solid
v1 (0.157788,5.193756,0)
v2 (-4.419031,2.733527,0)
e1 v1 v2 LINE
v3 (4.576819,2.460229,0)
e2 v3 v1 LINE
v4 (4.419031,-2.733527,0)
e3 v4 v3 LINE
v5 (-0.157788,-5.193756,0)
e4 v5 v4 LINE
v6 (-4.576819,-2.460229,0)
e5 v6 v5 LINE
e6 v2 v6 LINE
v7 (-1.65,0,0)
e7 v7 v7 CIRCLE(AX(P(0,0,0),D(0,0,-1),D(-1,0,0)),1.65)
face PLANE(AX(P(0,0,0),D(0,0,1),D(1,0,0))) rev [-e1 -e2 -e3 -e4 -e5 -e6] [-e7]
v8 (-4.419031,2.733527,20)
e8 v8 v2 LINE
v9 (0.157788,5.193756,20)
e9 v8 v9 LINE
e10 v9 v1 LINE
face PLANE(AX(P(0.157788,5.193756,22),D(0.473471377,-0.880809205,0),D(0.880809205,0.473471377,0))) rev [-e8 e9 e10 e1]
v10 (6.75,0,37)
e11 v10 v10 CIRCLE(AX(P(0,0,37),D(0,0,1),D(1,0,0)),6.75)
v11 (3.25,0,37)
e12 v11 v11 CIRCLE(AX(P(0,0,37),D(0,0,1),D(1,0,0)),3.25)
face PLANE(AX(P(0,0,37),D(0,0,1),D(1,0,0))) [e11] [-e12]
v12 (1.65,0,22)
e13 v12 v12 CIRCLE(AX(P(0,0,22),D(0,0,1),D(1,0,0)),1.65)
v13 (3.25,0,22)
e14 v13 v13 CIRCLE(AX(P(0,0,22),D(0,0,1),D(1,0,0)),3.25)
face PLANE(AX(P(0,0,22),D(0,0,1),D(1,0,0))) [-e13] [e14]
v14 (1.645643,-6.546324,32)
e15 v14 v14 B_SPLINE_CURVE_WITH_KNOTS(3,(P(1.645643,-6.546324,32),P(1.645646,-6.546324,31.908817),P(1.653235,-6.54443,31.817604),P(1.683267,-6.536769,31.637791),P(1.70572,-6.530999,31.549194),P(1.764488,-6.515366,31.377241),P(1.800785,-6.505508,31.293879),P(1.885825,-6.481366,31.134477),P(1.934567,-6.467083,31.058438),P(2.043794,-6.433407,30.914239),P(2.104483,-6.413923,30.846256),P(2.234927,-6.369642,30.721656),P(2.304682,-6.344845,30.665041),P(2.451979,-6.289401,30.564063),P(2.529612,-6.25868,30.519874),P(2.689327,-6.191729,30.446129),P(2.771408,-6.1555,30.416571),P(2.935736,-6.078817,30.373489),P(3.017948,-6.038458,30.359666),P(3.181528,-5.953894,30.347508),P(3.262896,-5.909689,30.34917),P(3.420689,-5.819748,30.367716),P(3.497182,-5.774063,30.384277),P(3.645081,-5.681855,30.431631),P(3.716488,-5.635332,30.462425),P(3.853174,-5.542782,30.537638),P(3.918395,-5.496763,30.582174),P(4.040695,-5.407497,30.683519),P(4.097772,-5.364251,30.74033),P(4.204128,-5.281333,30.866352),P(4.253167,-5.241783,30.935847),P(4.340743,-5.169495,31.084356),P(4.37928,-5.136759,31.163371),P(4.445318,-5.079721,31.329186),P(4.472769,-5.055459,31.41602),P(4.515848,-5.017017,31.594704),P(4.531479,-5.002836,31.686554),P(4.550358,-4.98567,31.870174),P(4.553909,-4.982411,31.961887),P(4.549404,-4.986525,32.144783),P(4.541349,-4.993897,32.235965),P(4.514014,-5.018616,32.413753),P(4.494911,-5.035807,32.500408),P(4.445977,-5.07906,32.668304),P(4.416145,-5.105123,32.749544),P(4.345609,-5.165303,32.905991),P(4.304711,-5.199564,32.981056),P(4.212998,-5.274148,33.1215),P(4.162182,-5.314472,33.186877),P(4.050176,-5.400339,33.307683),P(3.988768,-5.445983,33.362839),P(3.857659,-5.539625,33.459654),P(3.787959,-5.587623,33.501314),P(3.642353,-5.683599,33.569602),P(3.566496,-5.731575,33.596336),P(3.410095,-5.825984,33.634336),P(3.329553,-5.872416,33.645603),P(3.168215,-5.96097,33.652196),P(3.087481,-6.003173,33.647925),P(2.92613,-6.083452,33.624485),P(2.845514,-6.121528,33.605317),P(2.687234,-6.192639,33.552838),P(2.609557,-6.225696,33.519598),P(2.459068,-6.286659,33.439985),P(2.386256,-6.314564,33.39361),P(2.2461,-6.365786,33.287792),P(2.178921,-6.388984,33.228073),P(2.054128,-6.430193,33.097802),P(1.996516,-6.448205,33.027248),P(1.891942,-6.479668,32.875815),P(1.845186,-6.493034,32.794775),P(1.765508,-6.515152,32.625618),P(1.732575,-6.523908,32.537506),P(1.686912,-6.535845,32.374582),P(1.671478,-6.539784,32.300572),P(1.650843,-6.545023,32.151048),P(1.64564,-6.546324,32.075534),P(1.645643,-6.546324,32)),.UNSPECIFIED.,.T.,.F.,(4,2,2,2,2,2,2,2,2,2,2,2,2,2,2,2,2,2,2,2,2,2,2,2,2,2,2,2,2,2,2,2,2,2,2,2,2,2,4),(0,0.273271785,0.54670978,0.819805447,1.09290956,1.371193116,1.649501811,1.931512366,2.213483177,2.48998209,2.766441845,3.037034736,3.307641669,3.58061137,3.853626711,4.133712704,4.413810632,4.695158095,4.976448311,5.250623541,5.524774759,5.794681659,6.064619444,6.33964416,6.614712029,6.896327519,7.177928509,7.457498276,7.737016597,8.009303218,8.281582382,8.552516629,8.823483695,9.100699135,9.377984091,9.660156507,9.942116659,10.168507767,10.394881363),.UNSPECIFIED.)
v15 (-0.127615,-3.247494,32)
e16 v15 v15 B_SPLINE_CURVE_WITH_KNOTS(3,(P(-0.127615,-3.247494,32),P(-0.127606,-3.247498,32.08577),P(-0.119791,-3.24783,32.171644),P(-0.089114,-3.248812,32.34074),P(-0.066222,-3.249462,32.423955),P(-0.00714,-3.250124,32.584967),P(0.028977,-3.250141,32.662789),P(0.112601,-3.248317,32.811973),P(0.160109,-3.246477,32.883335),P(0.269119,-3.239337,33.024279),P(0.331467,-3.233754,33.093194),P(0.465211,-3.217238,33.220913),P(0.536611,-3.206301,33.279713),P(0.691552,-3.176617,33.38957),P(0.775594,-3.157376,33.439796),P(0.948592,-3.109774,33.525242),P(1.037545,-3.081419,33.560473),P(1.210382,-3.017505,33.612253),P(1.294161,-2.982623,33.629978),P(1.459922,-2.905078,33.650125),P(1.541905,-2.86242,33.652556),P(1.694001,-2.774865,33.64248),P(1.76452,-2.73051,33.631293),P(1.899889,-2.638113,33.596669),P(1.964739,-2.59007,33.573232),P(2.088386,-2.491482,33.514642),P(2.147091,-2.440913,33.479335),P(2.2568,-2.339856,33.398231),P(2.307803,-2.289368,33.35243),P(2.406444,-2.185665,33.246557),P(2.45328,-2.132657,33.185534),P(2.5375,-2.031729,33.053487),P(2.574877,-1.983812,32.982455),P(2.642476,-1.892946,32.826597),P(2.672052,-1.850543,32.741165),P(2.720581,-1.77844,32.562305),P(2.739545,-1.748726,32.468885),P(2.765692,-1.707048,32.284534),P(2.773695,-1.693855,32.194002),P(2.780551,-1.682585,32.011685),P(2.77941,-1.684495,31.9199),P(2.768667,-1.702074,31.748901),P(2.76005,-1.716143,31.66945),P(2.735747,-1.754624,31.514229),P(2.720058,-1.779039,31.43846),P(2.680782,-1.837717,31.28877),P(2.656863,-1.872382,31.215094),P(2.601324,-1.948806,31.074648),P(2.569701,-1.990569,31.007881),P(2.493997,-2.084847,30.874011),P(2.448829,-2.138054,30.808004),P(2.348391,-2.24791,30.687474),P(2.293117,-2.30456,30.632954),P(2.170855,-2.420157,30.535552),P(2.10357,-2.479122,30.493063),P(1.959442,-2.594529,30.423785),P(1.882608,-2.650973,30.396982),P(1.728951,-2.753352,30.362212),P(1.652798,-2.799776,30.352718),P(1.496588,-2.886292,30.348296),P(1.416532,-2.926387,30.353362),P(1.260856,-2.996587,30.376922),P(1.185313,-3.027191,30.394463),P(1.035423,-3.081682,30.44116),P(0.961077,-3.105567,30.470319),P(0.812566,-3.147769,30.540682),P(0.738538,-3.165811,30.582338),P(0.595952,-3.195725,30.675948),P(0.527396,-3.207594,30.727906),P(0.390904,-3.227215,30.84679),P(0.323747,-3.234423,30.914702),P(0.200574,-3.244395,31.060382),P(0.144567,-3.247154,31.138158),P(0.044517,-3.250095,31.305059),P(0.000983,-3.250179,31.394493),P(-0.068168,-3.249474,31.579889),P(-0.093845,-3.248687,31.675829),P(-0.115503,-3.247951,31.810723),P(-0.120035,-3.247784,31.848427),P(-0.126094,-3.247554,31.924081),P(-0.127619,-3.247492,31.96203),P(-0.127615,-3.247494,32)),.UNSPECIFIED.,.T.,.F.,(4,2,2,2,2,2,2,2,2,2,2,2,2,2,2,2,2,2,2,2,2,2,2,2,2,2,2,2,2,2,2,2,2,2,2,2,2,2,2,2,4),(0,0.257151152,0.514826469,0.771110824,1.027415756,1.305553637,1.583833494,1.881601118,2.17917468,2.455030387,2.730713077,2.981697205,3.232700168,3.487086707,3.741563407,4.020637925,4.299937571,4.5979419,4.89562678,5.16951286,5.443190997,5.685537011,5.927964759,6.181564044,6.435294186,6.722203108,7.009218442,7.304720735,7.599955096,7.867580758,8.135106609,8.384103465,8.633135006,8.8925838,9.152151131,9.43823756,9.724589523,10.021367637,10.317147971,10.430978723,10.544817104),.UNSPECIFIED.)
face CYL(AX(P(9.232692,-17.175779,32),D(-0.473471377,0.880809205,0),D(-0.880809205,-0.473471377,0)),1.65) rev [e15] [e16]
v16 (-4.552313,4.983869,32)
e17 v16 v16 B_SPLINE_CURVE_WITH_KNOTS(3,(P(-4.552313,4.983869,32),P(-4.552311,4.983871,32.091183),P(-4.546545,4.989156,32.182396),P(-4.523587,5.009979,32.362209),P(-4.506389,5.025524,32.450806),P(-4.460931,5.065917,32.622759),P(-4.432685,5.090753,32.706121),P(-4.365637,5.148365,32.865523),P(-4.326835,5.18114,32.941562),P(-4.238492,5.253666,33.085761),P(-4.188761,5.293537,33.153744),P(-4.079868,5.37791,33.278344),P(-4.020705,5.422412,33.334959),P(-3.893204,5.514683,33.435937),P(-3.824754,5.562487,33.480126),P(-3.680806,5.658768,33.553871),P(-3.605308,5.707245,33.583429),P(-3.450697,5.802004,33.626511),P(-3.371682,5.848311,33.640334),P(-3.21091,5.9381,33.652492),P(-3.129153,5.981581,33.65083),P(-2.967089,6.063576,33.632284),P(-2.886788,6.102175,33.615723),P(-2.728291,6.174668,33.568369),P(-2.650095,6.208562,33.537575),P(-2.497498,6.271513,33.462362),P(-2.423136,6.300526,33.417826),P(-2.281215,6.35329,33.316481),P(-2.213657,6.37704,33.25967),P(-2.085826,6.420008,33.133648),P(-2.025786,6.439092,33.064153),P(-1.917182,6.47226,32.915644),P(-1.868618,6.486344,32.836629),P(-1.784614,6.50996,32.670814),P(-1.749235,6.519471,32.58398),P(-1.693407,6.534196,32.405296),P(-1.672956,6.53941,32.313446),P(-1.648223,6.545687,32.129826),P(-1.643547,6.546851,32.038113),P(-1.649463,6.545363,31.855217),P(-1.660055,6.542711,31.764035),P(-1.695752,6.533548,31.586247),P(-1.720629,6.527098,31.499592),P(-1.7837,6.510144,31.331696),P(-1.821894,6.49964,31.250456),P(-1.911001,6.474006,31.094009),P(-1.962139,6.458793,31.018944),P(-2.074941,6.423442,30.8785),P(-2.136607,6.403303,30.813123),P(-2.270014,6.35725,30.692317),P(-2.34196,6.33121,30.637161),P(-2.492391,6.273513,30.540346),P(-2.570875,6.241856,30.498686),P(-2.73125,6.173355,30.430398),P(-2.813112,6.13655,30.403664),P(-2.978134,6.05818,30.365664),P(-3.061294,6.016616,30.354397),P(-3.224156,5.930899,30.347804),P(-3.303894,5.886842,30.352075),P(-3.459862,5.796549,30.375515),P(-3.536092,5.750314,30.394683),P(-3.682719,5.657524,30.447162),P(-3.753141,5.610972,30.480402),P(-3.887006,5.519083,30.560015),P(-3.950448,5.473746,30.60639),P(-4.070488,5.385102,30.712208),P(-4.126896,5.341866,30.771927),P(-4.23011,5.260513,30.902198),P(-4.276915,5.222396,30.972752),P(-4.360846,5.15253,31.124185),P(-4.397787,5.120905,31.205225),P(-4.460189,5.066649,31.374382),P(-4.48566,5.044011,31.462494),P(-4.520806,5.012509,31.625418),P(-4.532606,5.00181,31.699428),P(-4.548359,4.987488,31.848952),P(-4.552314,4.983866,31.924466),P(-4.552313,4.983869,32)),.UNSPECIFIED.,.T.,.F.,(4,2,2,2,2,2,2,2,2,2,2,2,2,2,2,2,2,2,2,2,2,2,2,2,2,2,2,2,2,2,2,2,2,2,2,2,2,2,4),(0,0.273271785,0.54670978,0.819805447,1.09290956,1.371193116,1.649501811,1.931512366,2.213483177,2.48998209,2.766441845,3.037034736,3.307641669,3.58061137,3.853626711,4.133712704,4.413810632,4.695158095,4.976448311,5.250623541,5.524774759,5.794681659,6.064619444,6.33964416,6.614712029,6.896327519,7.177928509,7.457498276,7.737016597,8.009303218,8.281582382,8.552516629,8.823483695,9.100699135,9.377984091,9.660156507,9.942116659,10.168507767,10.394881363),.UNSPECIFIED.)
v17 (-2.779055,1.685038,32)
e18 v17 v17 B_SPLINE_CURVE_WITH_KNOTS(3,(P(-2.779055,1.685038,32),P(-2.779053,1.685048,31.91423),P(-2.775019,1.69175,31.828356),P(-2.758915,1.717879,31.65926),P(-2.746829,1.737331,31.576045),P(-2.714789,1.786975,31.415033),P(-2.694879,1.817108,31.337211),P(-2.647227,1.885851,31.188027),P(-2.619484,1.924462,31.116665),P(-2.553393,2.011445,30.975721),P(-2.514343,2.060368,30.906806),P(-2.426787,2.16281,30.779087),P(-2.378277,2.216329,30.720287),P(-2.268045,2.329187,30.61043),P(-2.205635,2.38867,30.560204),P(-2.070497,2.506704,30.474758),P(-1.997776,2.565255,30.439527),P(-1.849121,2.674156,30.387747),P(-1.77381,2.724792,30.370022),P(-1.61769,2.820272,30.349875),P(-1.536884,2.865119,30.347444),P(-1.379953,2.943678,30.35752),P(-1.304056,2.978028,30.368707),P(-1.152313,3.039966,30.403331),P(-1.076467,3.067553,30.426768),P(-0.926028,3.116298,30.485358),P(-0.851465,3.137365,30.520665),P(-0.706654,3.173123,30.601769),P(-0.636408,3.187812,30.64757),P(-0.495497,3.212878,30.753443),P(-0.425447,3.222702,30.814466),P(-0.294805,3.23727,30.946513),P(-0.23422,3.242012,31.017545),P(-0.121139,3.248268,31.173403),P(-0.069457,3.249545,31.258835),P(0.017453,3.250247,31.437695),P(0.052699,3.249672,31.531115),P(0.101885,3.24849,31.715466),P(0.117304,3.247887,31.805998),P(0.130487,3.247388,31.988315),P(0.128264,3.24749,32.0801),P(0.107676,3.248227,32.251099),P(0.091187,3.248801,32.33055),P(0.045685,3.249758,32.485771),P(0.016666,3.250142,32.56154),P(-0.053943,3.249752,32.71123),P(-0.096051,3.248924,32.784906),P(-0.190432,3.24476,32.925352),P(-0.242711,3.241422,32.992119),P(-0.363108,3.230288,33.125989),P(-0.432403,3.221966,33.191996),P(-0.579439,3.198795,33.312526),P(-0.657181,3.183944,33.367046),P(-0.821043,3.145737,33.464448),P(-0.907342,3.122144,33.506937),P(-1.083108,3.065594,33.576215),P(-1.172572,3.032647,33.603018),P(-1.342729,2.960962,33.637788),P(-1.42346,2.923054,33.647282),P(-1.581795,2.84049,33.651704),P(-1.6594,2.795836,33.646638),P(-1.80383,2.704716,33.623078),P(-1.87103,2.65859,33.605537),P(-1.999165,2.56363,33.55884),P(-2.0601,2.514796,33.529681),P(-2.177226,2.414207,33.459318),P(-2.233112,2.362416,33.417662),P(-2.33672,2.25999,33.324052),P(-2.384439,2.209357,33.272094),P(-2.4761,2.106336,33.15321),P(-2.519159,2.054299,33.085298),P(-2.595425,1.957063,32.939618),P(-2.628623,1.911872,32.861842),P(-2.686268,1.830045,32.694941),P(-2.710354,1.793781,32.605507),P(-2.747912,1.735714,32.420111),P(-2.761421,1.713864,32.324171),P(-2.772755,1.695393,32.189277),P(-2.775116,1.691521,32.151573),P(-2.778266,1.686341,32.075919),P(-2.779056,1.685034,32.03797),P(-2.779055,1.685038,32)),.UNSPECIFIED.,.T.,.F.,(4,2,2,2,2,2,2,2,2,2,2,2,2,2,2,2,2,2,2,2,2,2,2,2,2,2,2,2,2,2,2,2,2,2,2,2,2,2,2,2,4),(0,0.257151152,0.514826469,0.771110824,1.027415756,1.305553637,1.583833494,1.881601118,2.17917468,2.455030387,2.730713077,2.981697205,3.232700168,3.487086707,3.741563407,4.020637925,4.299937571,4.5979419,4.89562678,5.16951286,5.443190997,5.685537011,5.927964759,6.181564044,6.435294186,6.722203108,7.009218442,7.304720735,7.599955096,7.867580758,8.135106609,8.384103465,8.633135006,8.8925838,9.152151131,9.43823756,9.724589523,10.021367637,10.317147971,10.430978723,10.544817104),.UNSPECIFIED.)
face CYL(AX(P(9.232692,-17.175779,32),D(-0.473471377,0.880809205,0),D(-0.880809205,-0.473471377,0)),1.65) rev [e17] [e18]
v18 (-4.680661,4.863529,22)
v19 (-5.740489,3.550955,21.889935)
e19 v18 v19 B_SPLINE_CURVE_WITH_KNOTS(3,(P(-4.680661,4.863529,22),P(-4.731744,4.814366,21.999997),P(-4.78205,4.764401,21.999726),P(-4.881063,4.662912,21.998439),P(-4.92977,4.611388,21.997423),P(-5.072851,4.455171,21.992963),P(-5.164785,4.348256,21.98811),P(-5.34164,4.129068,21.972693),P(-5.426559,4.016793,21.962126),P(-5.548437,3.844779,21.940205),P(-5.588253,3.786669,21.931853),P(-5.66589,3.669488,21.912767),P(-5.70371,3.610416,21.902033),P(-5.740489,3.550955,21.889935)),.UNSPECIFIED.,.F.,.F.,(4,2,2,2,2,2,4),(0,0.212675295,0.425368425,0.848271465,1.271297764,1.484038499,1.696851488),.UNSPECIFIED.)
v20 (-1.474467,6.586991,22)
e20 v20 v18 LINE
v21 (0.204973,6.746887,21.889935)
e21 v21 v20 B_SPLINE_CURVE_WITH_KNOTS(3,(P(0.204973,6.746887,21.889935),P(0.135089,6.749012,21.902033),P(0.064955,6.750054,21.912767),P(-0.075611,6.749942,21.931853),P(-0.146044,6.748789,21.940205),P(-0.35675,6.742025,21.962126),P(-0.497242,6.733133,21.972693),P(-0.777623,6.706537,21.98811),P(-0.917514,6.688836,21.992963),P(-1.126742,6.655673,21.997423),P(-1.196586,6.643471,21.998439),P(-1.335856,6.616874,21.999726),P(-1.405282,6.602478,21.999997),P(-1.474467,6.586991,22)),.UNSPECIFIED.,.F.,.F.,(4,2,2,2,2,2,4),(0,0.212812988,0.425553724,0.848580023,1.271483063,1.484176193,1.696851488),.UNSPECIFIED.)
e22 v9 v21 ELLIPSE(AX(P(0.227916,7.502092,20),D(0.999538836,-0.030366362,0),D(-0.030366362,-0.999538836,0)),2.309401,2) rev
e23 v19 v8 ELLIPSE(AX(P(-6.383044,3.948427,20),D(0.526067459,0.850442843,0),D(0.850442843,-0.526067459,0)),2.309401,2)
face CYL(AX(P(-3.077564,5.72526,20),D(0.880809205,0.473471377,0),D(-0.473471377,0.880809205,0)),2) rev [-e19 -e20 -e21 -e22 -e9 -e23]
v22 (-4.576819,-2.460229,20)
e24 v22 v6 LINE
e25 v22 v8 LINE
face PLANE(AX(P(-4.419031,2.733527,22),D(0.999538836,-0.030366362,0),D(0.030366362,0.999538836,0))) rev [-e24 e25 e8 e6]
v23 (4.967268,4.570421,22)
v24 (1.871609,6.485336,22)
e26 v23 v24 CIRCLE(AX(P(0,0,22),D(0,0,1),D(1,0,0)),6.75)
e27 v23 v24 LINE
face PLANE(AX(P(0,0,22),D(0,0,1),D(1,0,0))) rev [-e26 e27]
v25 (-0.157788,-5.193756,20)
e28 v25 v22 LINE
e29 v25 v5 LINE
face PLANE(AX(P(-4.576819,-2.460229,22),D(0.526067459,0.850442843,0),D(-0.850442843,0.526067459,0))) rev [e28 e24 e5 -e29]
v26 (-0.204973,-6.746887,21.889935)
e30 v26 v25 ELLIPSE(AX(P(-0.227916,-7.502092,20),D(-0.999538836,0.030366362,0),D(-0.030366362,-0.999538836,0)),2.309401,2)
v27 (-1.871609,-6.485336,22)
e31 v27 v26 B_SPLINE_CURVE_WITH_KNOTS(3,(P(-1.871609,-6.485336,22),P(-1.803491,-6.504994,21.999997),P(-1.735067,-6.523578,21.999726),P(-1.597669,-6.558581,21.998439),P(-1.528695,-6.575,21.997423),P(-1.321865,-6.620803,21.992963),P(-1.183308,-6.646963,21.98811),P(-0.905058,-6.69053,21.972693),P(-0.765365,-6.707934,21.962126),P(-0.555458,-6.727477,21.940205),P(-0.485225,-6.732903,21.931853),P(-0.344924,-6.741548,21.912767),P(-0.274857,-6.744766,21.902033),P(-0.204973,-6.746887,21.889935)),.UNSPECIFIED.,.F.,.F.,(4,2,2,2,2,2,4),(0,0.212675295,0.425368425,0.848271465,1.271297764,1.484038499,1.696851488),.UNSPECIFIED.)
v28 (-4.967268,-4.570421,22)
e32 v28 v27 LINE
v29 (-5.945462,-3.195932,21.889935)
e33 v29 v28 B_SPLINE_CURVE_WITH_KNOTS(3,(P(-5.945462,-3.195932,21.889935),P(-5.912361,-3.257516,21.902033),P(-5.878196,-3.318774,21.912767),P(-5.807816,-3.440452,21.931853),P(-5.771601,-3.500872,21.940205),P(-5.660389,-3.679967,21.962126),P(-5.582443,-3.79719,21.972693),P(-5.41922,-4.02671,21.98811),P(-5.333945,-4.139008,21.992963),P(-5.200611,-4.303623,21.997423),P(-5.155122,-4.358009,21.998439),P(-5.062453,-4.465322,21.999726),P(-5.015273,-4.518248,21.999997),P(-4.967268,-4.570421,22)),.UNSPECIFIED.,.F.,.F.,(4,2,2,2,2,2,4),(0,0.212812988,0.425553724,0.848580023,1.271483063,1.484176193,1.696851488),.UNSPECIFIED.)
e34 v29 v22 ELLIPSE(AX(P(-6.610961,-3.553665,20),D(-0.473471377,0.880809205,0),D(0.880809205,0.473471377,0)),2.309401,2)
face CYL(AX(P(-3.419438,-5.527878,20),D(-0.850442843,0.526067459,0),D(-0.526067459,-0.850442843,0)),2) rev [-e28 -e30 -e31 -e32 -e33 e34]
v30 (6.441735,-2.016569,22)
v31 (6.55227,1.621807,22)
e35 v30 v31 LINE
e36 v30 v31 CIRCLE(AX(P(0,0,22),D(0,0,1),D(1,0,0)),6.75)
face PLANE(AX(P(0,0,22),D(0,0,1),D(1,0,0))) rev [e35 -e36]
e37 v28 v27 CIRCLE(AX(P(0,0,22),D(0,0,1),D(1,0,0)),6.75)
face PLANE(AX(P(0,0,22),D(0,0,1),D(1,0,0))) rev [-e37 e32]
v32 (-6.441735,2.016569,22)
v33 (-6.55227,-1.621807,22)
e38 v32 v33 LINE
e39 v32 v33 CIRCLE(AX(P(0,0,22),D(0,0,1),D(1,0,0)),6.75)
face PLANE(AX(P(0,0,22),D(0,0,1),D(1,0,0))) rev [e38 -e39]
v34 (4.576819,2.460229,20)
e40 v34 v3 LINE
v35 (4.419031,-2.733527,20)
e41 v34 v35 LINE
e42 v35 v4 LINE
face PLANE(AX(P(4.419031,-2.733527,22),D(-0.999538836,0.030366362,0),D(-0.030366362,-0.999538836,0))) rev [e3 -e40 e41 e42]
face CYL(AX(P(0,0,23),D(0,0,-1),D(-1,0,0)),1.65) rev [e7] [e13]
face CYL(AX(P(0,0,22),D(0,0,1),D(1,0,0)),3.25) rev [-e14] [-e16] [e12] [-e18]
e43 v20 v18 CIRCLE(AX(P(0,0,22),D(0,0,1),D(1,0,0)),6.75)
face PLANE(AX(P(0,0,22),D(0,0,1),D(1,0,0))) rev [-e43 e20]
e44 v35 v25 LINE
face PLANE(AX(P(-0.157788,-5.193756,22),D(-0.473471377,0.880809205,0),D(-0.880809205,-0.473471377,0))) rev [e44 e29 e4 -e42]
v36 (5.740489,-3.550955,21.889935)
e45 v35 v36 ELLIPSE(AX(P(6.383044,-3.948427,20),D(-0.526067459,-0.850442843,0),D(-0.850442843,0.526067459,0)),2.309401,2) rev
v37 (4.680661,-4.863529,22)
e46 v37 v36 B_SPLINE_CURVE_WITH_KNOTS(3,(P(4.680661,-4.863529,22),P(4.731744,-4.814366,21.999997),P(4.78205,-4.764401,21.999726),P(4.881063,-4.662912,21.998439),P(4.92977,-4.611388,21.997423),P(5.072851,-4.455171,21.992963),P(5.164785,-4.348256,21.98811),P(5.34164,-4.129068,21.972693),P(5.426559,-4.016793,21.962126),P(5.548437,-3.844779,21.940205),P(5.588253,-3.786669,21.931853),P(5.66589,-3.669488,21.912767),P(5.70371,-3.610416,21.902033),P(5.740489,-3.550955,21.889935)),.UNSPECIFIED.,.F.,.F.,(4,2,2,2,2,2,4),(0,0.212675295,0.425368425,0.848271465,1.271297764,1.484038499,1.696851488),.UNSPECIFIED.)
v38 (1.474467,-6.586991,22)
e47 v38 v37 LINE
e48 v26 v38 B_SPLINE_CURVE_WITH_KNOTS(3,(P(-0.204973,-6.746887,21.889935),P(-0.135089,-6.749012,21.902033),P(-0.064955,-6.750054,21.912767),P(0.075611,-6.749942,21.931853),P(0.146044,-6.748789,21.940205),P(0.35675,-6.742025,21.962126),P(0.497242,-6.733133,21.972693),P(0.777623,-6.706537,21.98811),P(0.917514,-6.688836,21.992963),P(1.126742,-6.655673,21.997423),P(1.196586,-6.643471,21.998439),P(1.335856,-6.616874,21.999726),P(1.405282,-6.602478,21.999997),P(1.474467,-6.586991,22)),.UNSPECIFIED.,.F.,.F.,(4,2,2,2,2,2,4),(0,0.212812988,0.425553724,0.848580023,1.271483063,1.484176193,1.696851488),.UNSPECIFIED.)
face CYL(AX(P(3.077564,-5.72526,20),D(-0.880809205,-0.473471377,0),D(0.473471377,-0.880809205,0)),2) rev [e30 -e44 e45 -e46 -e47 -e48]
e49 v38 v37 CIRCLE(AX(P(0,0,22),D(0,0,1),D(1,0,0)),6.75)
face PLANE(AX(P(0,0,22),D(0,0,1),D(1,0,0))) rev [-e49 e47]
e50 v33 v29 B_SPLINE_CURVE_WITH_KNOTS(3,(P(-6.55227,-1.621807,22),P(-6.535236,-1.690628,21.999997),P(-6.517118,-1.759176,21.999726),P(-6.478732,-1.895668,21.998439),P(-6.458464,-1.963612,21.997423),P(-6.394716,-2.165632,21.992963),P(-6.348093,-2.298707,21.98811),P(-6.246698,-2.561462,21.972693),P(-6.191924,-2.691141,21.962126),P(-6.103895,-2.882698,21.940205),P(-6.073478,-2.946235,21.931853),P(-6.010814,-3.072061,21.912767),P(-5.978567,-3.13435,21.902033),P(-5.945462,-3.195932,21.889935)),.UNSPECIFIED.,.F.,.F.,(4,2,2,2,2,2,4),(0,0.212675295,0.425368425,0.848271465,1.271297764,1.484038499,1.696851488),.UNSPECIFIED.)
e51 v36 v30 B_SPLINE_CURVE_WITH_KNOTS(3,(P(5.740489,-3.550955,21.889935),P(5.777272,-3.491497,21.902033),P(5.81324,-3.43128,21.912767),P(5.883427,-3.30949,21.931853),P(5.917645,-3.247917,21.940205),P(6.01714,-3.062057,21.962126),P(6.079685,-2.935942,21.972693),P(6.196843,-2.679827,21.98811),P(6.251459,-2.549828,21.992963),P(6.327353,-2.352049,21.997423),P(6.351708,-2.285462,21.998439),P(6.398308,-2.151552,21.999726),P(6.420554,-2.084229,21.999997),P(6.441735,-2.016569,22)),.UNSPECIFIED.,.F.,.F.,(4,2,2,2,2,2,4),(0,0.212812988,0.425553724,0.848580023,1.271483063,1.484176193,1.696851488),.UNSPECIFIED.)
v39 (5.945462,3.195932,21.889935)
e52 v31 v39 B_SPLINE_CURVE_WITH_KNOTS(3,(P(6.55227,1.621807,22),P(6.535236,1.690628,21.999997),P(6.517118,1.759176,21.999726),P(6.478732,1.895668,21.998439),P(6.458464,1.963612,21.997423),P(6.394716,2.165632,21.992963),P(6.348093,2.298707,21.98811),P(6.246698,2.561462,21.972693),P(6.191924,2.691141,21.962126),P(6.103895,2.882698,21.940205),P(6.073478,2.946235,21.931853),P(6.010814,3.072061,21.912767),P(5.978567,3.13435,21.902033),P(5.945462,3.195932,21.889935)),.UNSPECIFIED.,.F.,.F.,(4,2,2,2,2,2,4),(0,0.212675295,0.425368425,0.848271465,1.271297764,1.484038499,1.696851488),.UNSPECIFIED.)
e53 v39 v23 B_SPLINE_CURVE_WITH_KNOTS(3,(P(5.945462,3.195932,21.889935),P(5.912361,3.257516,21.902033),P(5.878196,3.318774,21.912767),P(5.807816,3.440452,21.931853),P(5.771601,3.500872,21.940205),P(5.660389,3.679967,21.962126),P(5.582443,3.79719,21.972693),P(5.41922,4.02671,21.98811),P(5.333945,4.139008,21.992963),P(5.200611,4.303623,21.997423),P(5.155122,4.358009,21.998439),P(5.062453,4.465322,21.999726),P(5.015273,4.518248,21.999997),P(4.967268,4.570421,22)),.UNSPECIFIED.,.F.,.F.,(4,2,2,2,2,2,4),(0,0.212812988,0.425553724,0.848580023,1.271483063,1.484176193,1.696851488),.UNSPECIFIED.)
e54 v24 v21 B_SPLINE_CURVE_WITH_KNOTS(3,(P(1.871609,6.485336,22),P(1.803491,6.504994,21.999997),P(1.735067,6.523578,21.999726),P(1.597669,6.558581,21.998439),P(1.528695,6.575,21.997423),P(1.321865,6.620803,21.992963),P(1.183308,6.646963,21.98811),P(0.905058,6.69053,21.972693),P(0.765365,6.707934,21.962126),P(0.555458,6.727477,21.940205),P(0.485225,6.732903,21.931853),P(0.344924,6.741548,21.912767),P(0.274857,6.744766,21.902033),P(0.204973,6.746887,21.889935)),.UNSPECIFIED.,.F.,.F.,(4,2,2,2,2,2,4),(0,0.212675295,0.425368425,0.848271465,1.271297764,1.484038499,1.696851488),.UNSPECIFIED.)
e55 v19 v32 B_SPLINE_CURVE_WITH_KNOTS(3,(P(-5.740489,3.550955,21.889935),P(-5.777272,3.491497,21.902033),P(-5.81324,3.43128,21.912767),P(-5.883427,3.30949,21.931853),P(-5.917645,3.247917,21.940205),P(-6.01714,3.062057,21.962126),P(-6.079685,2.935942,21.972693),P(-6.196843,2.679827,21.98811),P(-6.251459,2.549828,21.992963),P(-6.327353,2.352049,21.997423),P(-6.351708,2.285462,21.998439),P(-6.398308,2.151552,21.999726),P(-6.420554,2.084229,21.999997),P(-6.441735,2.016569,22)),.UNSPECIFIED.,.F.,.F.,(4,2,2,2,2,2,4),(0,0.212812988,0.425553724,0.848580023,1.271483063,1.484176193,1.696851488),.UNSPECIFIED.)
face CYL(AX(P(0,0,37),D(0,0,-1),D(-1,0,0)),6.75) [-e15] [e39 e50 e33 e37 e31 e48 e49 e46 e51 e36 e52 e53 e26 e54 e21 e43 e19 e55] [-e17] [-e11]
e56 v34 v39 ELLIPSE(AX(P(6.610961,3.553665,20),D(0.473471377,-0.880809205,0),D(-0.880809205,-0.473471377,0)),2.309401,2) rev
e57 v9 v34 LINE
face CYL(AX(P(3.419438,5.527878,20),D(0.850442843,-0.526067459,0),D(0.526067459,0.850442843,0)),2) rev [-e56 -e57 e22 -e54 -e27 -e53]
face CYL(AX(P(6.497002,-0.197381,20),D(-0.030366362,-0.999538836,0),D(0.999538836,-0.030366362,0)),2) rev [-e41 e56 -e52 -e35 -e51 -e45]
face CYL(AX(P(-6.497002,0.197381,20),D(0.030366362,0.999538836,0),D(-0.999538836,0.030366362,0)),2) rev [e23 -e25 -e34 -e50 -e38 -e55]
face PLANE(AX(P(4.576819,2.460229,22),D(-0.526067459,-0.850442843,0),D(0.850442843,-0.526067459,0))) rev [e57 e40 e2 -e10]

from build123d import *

# Parameters (mm, degrees)
BOSS_EXTRUDE1_DEPTH     = 22
SKETCH2_R               = 6.75
BOSS_EXTRUDE2_DEPTH     = 15
SKETCH3_R               = 3.25
CUT_EXTRUDE1_DEPTH      = 15
FILLET2_R               = 2
CUT_EXTRUDE2_DEPTH      = 15
CUT_EXTRUDE2_DEPTH_BACK = 15
SKETCH8_R               = 1.65
SKETCH9_R               = 1.65
CUT_EXTRUDE3_DEPTH      = 23


with BuildPart() as part:
    # Sketch1 → Boss-Extrude1 (new body)
    with BuildSketch(Plane.XY):
        Polygon((4.576818883, 2.460229443), (0.157788245, 5.193756143), (-4.419030638, 2.7335267), (-4.576818883, -2.460229443), (-0.157788245, -5.193756143), (4.419030638, -2.7335267), align=None)
    extrude(amount=BOSS_EXTRUDE1_DEPTH)

    # Sketch2 → Boss-Extrude2 (add)
    with BuildSketch(Plane.XY.offset(22)):
        Circle(SKETCH2_R)
    extrude(amount=BOSS_EXTRUDE2_DEPTH)

    # Sketch3 → Cut-Extrude1 (cut)
    with BuildSketch(Plane.XY.offset(37)):
        Circle(SKETCH3_R)
    extrude(amount=-CUT_EXTRUDE1_DEPTH, mode=Mode.SUBTRACT)

    # Fillet2
    # the kernel refuses this fillet: 2 mm, written as the material it adds along each edge
    with BuildSketch(Plane(origin=(-4.267198829, 7.731220878, 22), x_dir=(-0.9995388356967246, 0.03036636188344194, 0), z_dir=(-0.03036636188344194, -0.9995388356967246, 0))) as fillet2_piece_1_section:
        with BuildLine():
            CenterArc((FILLET2_R, FILLET2_R), FILLET2_R, 180, 90)
            Line((0, FILLET2_R), (0, 0))
            Line((0, 0), (FILLET2_R, 0))
        make_face()
    fillet2_piece_1 = extrude(amount=15.196152423, mode=Mode.PRIVATE)
    fillet2_piece_1 = split(fillet2_piece_1, bisect_by=Plane(origin=(-5.873586192, 1.951642931, 21.520073337), z_dir=(0.4734713770367902, -0.8808092047242045, 0)), keep=Keep.TOP, mode=Mode.PRIVATE)
    fillet2_piece_1 = split(fillet2_piece_1, bisect_by=Plane(origin=(-5.981227867, -1.591489267, 21.520073337), z_dir=(0.5260674586599344, 0.8504428428407627, 0)), keep=Keep.TOP, mode=Mode.PRIVATE)
    add(fillet2_piece_1)
    with BuildSketch(Plane(origin=(-8.829033097, 0.17010785, 22), x_dir=(-0.5260674586599344, -0.8504428428407628, 0), z_dir=(0.8504428428407627, -0.5260674586599344, 0))) as fillet2_piece_2_section:
        with BuildLine():
            CenterArc((FILLET2_R, FILLET2_R), FILLET2_R, 180, 90)
            Line((0, FILLET2_R), (0, 0))
            Line((0, 0), (FILLET2_R, 0))
        make_face()
    fillet2_piece_2 = extrude(amount=15.196152423, mode=Mode.PRIVATE)
    fillet2_piece_2 = split(fillet2_piece_2, bisect_by=Plane(origin=(-4.626965453, -4.110853388, 21.520073337), z_dir=(0.9995388356967246, -0.03036636188344194, 0)), keep=Keep.TOP, mode=Mode.PRIVATE)
    fillet2_piece_2 = split(fillet2_piece_2, bisect_by=Plane(origin=(-1.612343798, -5.975639912, 21.520073337), z_dir=(-0.47347137703679026, 0.8808092047242045, 0)), keep=Keep.TOP, mode=Mode.PRIVATE)
    add(fillet2_piece_2)
    with BuildSketch(Plane(origin=(-4.561834268, -7.561113028, 22), x_dir=(0.47347137703679026, -0.8808092047242045, 0), z_dir=(0.8808092047242045, 0.47347137703679026, 0))) as fillet2_piece_3_section:
        with BuildLine():
            CenterArc((FILLET2_R, FILLET2_R), FILLET2_R, 180, 90)
            Line((0, FILLET2_R), (0, 0))
            Line((0, 0), (FILLET2_R, 0))
        make_face()
    fillet2_piece_3 = extrude(amount=15.196152423, mode=Mode.PRIVATE)
    fillet2_piece_3 = split(fillet2_piece_3, bisect_by=Plane(origin=(1.246620739, -6.062496319, 21.520073337), z_dir=(0.5260674586599344, 0.8504428428407627, 0)), keep=Keep.TOP, mode=Mode.PRIVATE)
    fillet2_piece_3 = split(fillet2_piece_3, bisect_by=Plane(origin=(4.368884068, -4.384150645, 21.520073337), z_dir=(-0.9995388356967246, 0.030366361883441762, 0)), keep=Keep.TOP, mode=Mode.PRIVATE)
    add(fillet2_piece_3)
    with BuildSketch(Plane(origin=(4.267198829, -7.731220878, 22), x_dir=(0.9995388356967246, -0.030366361883441762, 0), z_dir=(0.030366361883441762, 0.9995388356967246, 0))) as fillet2_piece_4_section:
        with BuildLine():
            CenterArc((FILLET2_R, FILLET2_R), FILLET2_R, 180, 90)
            Line((0, FILLET2_R), (0, 0))
            Line((0, 0), (FILLET2_R, 0))
        make_face()
    fillet2_piece_4 = extrude(amount=15.196152423, mode=Mode.PRIVATE)
    fillet2_piece_4 = split(fillet2_piece_4, bisect_by=Plane(origin=(5.981227867, 1.591489267, 21.520073337), z_dir=(-0.5260674586599344, -0.8504428428407628, 0)), keep=Keep.TOP, mode=Mode.PRIVATE)
    fillet2_piece_4 = split(fillet2_piece_4, bisect_by=Plane(origin=(5.873586192, -1.951642931, 21.520073337), z_dir=(-0.47347137703679026, 0.8808092047242045, 0)), keep=Keep.TOP, mode=Mode.PRIVATE)
    add(fillet2_piece_4)
    with BuildSketch(Plane(origin=(8.829033097, -0.17010785, 22), x_dir=(0.5260674586599344, 0.8504428428407628, 0), z_dir=(-0.8504428428407628, 0.5260674586599344, 0))) as fillet2_piece_5_section:
        with BuildLine():
            CenterArc((FILLET2_R, FILLET2_R), FILLET2_R, 180, 90)
            Line((0, FILLET2_R), (0, 0))
            Line((0, 0), (FILLET2_R, 0))
        make_face()
    fillet2_piece_5 = extrude(amount=15.196152423, mode=Mode.PRIVATE)
    fillet2_piece_5 = split(fillet2_piece_5, bisect_by=Plane(origin=(4.626965453, 4.110853388, 21.520073337), z_dir=(-0.9995388356967246, 0.030366361883441762, 0)), keep=Keep.TOP, mode=Mode.PRIVATE)
    fillet2_piece_5 = split(fillet2_piece_5, bisect_by=Plane(origin=(1.612343798, 5.975639912, 21.520073337), z_dir=(0.4734713770367902, -0.8808092047242045, 0)), keep=Keep.TOP, mode=Mode.PRIVATE)
    add(fillet2_piece_5)
    with BuildSketch(Plane(origin=(4.561834268, 7.561113028, 22), x_dir=(-0.4734713770367902, 0.8808092047242045, 0), z_dir=(-0.8808092047242045, -0.4734713770367902, 0))) as fillet2_piece_6_section:
        with BuildLine():
            CenterArc((FILLET2_R, FILLET2_R), FILLET2_R, 180, 90)
            Line((0, FILLET2_R), (0, 0))
            Line((0, 0), (FILLET2_R, 0))
        make_face()
    fillet2_piece_6 = extrude(amount=15.196152423, mode=Mode.PRIVATE)
    fillet2_piece_6 = split(fillet2_piece_6, bisect_by=Plane(origin=(-1.246620739, 6.062496319, 21.520073337), z_dir=(-0.5260674586599344, -0.8504428428407628, 0)), keep=Keep.TOP, mode=Mode.PRIVATE)
    fillet2_piece_6 = split(fillet2_piece_6, bisect_by=Plane(origin=(-4.368884068, 4.384150645, 21.520073337), z_dir=(0.9995388356967246, -0.03036636188344194, 0)), keep=Keep.TOP, mode=Mode.PRIVATE)
    add(fillet2_piece_6)
    with BuildSketch(Plane(origin=(4.561834268, 7.561113028, 22), x_dir=(-0.4734713770367902, 0.8808092047242045, 0), z_dir=(-0.8808092047242045, -0.4734713770367902, 0))) as fillet2_piece_7a_section:
        with BuildLine():
            CenterArc((FILLET2_R, FILLET2_R), FILLET2_R, 180, 90)
            Line((0, FILLET2_R), (0, 0))
            Line((0, 0), (FILLET2_R, 0))
        make_face()
    fillet2_piece_7a = extrude(amount=15.196152423, mode=Mode.PRIVATE)
    fillet2_piece_7a = fillet2_piece_7a & Plane(origin=(0, 0, 21.516481321), x_dir=(1, 0, 0), z_dir=(0, 0, -1)) * Cylinder(6.75, 39, mode=Mode.PRIVATE)
    fillet2_piece_7a = split(fillet2_piece_7a, bisect_by=Plane(origin=(-4.422187766, 2.629606724, 21.516481321), z_dir=(-0.9995388356967246, 0.03036636188344194, 0)), keep=Keep.TOP, mode=Mode.PRIVATE)
    with BuildSketch(Plane(origin=(-4.267198829, 7.731220878, 22), x_dir=(-0.9995388356967246, 0.03036636188344194, 0), z_dir=(-0.03036636188344194, -0.9995388356967246, 0))) as fillet2_piece_7b_section:
        with BuildLine():
            CenterArc((FILLET2_R, FILLET2_R), FILLET2_R, 180, 90)
            Line((0, FILLET2_R), (0, 0))
            Line((0, 0), (FILLET2_R, 0))
        make_face()
    fillet2_piece_7b = extrude(amount=15.196152423, mode=Mode.PRIVATE)
    fillet2_piece_7b = fillet2_piece_7b & Plane(origin=(0, 0, 21.516480171), x_dir=(1, 0, 0), z_dir=(0, 0, -1)) * Cylinder(6.75, 39, mode=Mode.PRIVATE)
    fillet2_piece_7b = split(fillet2_piece_7b, bisect_by=Plane(origin=(-4.32745598, 2.782751866, 21.516480171), z_dir=(-0.4734713770367902, 0.8808092047242045, 0)), keep=Keep.TOP, mode=Mode.PRIVATE)
    fillet2_piece_7 = fillet2_piece_7a & fillet2_piece_7b
    add(fillet2_piece_7)
    with BuildSketch(Plane(origin=(-4.267198829, 7.731220878, 22), x_dir=(-0.9995388356967246, 0.03036636188344194, 0), z_dir=(-0.03036636188344194, -0.9995388356967246, 0))) as fillet2_piece_8a_section:
        with BuildLine():
            CenterArc((FILLET2_R, FILLET2_R), FILLET2_R, 180, 90)
            Line((0, FILLET2_R), (0, 0))
            Line((0, 0), (FILLET2_R, 0))
        make_face()
    fillet2_piece_8a = extrude(amount=15.196152423, mode=Mode.PRIVATE)
    fillet2_piece_8a = fillet2_piece_8a & Plane(origin=(0, 0, 21.516481321), x_dir=(1, 0, 0), z_dir=(0, 0, -1)) * Cylinder(6.75, 39, mode=Mode.PRIVATE)
    fillet2_piece_8a = split(fillet2_piece_8a, bisect_by=Plane(origin=(-4.488400107, -2.514923584, 21.516481321), z_dir=(-0.5260674586599344, -0.8504428428407627, 0)), keep=Keep.TOP, mode=Mode.PRIVATE)
    with BuildSketch(Plane(origin=(-8.829033097, 0.17010785, 22), x_dir=(-0.5260674586599344, -0.8504428428407628, 0), z_dir=(0.8504428428407627, -0.5260674586599344, 0))) as fillet2_piece_8b_section:
        with BuildLine():
            CenterArc((FILLET2_R, FILLET2_R), FILLET2_R, 180, 90)
            Line((0, FILLET2_R), (0, 0))
            Line((0, 0), (FILLET2_R, 0))
        make_face()
    fillet2_piece_8b = extrude(amount=15.196152423, mode=Mode.PRIVATE)
    fillet2_piece_8b = fillet2_piece_8b & Plane(origin=(0, 0, 21.516480171), x_dir=(1, 0, 0), z_dir=(0, 0, -1)) * Cylinder(6.75, 39, mode=Mode.PRIVATE)
    fillet2_piece_8b = split(fillet2_piece_8b, bisect_by=Plane(origin=(-4.573661798, -2.356310879, 21.516480171), z_dir=(-0.9995388356967246, 0.03036636188344194, 0)), keep=Keep.TOP, mode=Mode.PRIVATE)
    fillet2_piece_8 = fillet2_piece_8a & fillet2_piece_8b
    add(fillet2_piece_8)
    with BuildSketch(Plane(origin=(-8.829033097, 0.17010785, 22), x_dir=(-0.5260674586599344, -0.8504428428407628, 0), z_dir=(0.8504428428407627, -0.5260674586599344, 0))) as fillet2_piece_9a_section:
        with BuildLine():
            CenterArc((FILLET2_R, FILLET2_R), FILLET2_R, 180, 90)
            Line((0, FILLET2_R), (0, 0))
            Line((0, 0), (FILLET2_R, 0))
        make_face()
    fillet2_piece_9a = extrude(amount=15.196152423, mode=Mode.PRIVATE)
    fillet2_piece_9a = fillet2_piece_9a & Plane(origin=(0, 0, 21.516481321), x_dir=(1, 0, 0), z_dir=(0, 0, -1)) * Cylinder(6.75, 39, mode=Mode.PRIVATE)
    fillet2_piece_9a = split(fillet2_piece_9a, bisect_by=Plane(origin=(-0.066212341, -5.144530307, 21.516481321), z_dir=(0.47347137703679026, -0.8808092047242045, 0)), keep=Keep.TOP, mode=Mode.PRIVATE)
    with BuildSketch(Plane(origin=(-4.561834268, -7.561113028, 22), x_dir=(0.47347137703679026, -0.8808092047242045, 0), z_dir=(0.8808092047242045, 0.47347137703679026, 0))) as fillet2_piece_9b_section:
        with BuildLine():
            CenterArc((FILLET2_R, FILLET2_R), FILLET2_R, 180, 90)
            Line((0, FILLET2_R), (0, 0))
            Line((0, 0), (FILLET2_R, 0))
        make_face()
    fillet2_piece_9b = extrude(amount=15.196152423, mode=Mode.PRIVATE)
    fillet2_piece_9b = fillet2_piece_9b & Plane(origin=(0, 0, 21.516480171), x_dir=(1, 0, 0), z_dir=(0, 0, -1)) * Cylinder(6.75, 39, mode=Mode.PRIVATE)
    fillet2_piece_9b = split(fillet2_piece_9b, bisect_by=Plane(origin=(-0.246205818, -5.139062745, 21.516480171), z_dir=(-0.5260674586599344, -0.8504428428407627, 0)), keep=Keep.TOP, mode=Mode.PRIVATE)
    fillet2_piece_9 = fillet2_piece_9a & fillet2_piece_9b
    add(fillet2_piece_9)
    with BuildSketch(Plane(origin=(-4.561834268, -7.561113028, 22), x_dir=(0.47347137703679026, -0.8808092047242045, 0), z_dir=(0.8808092047242045, 0.47347137703679026, 0))) as fillet2_piece_10a_section:
        with BuildLine():
            CenterArc((FILLET2_R, FILLET2_R), FILLET2_R, 180, 90)
            Line((0, FILLET2_R), (0, 0))
            Line((0, 0), (FILLET2_R, 0))
        make_face()
    fillet2_piece_10a = extrude(amount=15.196152423, mode=Mode.PRIVATE)
    fillet2_piece_10a = fillet2_piece_10a & Plane(origin=(0, 0, 21.516481321), x_dir=(1, 0, 0), z_dir=(0, 0, -1)) * Cylinder(6.75, 39, mode=Mode.PRIVATE)
    fillet2_piece_10a = split(fillet2_piece_10a, bisect_by=Plane(origin=(4.422187766, -2.629606724, 21.516481321), z_dir=(0.9995388356967246, -0.030366361883441762, 0)), keep=Keep.TOP, mode=Mode.PRIVATE)
    with BuildSketch(Plane(origin=(4.267198829, -7.731220878, 22), x_dir=(0.9995388356967246, -0.030366361883441762, 0), z_dir=(0.030366361883441762, 0.9995388356967246, 0))) as fillet2_piece_10b_section:
        with BuildLine():
            CenterArc((FILLET2_R, FILLET2_R), FILLET2_R, 180, 90)
            Line((0, FILLET2_R), (0, 0))
            Line((0, 0), (FILLET2_R, 0))
        make_face()
    fillet2_piece_10b = extrude(amount=15.196152423, mode=Mode.PRIVATE)
    fillet2_piece_10b = fillet2_piece_10b & Plane(origin=(0, 0, 21.516480171), x_dir=(1, 0, 0), z_dir=(0, 0, -1)) * Cylinder(6.75, 39, mode=Mode.PRIVATE)
    fillet2_piece_10b = split(fillet2_piece_10b, bisect_by=Plane(origin=(4.32745598, -2.782751866, 21.516480171), z_dir=(0.47347137703679026, -0.8808092047242045, 0)), keep=Keep.TOP, mode=Mode.PRIVATE)
    fillet2_piece_10 = fillet2_piece_10a & fillet2_piece_10b
    add(fillet2_piece_10)
    with BuildSketch(Plane(origin=(8.829033097, -0.17010785, 22), x_dir=(0.5260674586599344, 0.8504428428407628, 0), z_dir=(-0.8504428428407628, 0.5260674586599344, 0))) as fillet2_piece_11a_section:
        with BuildLine():
            CenterArc((FILLET2_R, FILLET2_R), FILLET2_R, 180, 90)
            Line((0, FILLET2_R), (0, 0))
            Line((0, 0), (FILLET2_R, 0))
        make_face()
    fillet2_piece_11a = extrude(amount=15.196152423, mode=Mode.PRIVATE)
    fillet2_piece_11a = fillet2_piece_11a & Plane(origin=(0, 0, 21.516480171), x_dir=(1, 0, 0), z_dir=(0, 0, -1)) * Cylinder(6.75, 39, mode=Mode.PRIVATE)
    fillet2_piece_11a = split(fillet2_piece_11a, bisect_by=Plane(origin=(4.573661798, 2.356310879, 21.516480171), z_dir=(0.9995388356967246, -0.030366361883441762, 0)), keep=Keep.TOP, mode=Mode.PRIVATE)
    with BuildSketch(Plane(origin=(4.267198829, -7.731220878, 22), x_dir=(0.9995388356967246, -0.030366361883441762, 0), z_dir=(0.030366361883441762, 0.9995388356967246, 0))) as fillet2_piece_11b_section:
        with BuildLine():
            CenterArc((FILLET2_R, FILLET2_R), FILLET2_R, 180, 90)
            Line((0, FILLET2_R), (0, 0))
            Line((0, 0), (FILLET2_R, 0))
        make_face()
    fillet2_piece_11b = extrude(amount=15.196152423, mode=Mode.PRIVATE)
    fillet2_piece_11b = fillet2_piece_11b & Plane(origin=(0, 0, 21.516481321), x_dir=(1, 0, 0), z_dir=(0, 0, -1)) * Cylinder(6.75, 39, mode=Mode.PRIVATE)
    fillet2_piece_11b = split(fillet2_piece_11b, bisect_by=Plane(origin=(4.488400107, 2.514923584, 21.516481321), z_dir=(0.5260674586599344, 0.8504428428407628, 0)), keep=Keep.TOP, mode=Mode.PRIVATE)
    fillet2_piece_11 = fillet2_piece_11a & fillet2_piece_11b
    add(fillet2_piece_11)
    with BuildSketch(Plane(origin=(8.829033097, -0.17010785, 22), x_dir=(0.5260674586599344, 0.8504428428407628, 0), z_dir=(-0.8504428428407628, 0.5260674586599344, 0))) as fillet2_piece_12a_section:
        with BuildLine():
            CenterArc((FILLET2_R, FILLET2_R), FILLET2_R, 180, 90)
            Line((0, FILLET2_R), (0, 0))
            Line((0, 0), (FILLET2_R, 0))
        make_face()
    fillet2_piece_12a = extrude(amount=15.196152423, mode=Mode.PRIVATE)
    fillet2_piece_12a = fillet2_piece_12a & Plane(origin=(0, 0, 21.516481321), x_dir=(1, 0, 0), z_dir=(0, 0, -1)) * Cylinder(6.75, 39, mode=Mode.PRIVATE)
    fillet2_piece_12a = split(fillet2_piece_12a, bisect_by=Plane(origin=(0.066212341, 5.144530307, 21.516481321), z_dir=(-0.4734713770367902, 0.8808092047242045, 0)), keep=Keep.TOP, mode=Mode.PRIVATE)
    with BuildSketch(Plane(origin=(4.561834268, 7.561113028, 22), x_dir=(-0.4734713770367902, 0.8808092047242045, 0), z_dir=(-0.8808092047242045, -0.4734713770367902, 0))) as fillet2_piece_12b_section:
        with BuildLine():
            CenterArc((FILLET2_R, FILLET2_R), FILLET2_R, 180, 90)
            Line((0, FILLET2_R), (0, 0))
            Line((0, 0), (FILLET2_R, 0))
        make_face()
    fillet2_piece_12b = extrude(amount=15.196152423, mode=Mode.PRIVATE)
    fillet2_piece_12b = fillet2_piece_12b & Plane(origin=(0, 0, 21.516480171), x_dir=(1, 0, 0), z_dir=(0, 0, -1)) * Cylinder(6.75, 39, mode=Mode.PRIVATE)
    fillet2_piece_12b = split(fillet2_piece_12b, bisect_by=Plane(origin=(0.246205818, 5.139062745, 21.516480171), z_dir=(0.5260674586599344, 0.8504428428407628, 0)), keep=Keep.TOP, mode=Mode.PRIVATE)
    fillet2_piece_12 = fillet2_piece_12a & fillet2_piece_12b
    add(fillet2_piece_12)

    # Sketch8 → Cut-Extrude2 (cut, two sides: drawn at the far end of the back side and taken through both)
    with BuildSketch(Plane(origin=(2.130621197, -3.963641421, 0), x_dir=(-0.8808092047242045, -0.4734713770367903, 0), z_dir=(0.4734713770367903, -0.8808092047242045, 0)).offset(-CUT_EXTRUDE2_DEPTH_BACK)):
        with Locations((0, -32)):
            Circle(SKETCH8_R)
    extrude(amount=CUT_EXTRUDE2_DEPTH + CUT_EXTRUDE2_DEPTH_BACK, mode=Mode.SUBTRACT)

    # Sketch9 → Cut-Extrude3 (cut)
    with BuildSketch(Plane(origin=(0, 0, 0), x_dir=(-1, 0, 0), z_dir=(0, 0, -1))):
        Circle(SKETCH9_R)
    extrude(amount=-CUT_EXTRUDE3_DEPTH, mode=Mode.SUBTRACT)


solid = part.part
